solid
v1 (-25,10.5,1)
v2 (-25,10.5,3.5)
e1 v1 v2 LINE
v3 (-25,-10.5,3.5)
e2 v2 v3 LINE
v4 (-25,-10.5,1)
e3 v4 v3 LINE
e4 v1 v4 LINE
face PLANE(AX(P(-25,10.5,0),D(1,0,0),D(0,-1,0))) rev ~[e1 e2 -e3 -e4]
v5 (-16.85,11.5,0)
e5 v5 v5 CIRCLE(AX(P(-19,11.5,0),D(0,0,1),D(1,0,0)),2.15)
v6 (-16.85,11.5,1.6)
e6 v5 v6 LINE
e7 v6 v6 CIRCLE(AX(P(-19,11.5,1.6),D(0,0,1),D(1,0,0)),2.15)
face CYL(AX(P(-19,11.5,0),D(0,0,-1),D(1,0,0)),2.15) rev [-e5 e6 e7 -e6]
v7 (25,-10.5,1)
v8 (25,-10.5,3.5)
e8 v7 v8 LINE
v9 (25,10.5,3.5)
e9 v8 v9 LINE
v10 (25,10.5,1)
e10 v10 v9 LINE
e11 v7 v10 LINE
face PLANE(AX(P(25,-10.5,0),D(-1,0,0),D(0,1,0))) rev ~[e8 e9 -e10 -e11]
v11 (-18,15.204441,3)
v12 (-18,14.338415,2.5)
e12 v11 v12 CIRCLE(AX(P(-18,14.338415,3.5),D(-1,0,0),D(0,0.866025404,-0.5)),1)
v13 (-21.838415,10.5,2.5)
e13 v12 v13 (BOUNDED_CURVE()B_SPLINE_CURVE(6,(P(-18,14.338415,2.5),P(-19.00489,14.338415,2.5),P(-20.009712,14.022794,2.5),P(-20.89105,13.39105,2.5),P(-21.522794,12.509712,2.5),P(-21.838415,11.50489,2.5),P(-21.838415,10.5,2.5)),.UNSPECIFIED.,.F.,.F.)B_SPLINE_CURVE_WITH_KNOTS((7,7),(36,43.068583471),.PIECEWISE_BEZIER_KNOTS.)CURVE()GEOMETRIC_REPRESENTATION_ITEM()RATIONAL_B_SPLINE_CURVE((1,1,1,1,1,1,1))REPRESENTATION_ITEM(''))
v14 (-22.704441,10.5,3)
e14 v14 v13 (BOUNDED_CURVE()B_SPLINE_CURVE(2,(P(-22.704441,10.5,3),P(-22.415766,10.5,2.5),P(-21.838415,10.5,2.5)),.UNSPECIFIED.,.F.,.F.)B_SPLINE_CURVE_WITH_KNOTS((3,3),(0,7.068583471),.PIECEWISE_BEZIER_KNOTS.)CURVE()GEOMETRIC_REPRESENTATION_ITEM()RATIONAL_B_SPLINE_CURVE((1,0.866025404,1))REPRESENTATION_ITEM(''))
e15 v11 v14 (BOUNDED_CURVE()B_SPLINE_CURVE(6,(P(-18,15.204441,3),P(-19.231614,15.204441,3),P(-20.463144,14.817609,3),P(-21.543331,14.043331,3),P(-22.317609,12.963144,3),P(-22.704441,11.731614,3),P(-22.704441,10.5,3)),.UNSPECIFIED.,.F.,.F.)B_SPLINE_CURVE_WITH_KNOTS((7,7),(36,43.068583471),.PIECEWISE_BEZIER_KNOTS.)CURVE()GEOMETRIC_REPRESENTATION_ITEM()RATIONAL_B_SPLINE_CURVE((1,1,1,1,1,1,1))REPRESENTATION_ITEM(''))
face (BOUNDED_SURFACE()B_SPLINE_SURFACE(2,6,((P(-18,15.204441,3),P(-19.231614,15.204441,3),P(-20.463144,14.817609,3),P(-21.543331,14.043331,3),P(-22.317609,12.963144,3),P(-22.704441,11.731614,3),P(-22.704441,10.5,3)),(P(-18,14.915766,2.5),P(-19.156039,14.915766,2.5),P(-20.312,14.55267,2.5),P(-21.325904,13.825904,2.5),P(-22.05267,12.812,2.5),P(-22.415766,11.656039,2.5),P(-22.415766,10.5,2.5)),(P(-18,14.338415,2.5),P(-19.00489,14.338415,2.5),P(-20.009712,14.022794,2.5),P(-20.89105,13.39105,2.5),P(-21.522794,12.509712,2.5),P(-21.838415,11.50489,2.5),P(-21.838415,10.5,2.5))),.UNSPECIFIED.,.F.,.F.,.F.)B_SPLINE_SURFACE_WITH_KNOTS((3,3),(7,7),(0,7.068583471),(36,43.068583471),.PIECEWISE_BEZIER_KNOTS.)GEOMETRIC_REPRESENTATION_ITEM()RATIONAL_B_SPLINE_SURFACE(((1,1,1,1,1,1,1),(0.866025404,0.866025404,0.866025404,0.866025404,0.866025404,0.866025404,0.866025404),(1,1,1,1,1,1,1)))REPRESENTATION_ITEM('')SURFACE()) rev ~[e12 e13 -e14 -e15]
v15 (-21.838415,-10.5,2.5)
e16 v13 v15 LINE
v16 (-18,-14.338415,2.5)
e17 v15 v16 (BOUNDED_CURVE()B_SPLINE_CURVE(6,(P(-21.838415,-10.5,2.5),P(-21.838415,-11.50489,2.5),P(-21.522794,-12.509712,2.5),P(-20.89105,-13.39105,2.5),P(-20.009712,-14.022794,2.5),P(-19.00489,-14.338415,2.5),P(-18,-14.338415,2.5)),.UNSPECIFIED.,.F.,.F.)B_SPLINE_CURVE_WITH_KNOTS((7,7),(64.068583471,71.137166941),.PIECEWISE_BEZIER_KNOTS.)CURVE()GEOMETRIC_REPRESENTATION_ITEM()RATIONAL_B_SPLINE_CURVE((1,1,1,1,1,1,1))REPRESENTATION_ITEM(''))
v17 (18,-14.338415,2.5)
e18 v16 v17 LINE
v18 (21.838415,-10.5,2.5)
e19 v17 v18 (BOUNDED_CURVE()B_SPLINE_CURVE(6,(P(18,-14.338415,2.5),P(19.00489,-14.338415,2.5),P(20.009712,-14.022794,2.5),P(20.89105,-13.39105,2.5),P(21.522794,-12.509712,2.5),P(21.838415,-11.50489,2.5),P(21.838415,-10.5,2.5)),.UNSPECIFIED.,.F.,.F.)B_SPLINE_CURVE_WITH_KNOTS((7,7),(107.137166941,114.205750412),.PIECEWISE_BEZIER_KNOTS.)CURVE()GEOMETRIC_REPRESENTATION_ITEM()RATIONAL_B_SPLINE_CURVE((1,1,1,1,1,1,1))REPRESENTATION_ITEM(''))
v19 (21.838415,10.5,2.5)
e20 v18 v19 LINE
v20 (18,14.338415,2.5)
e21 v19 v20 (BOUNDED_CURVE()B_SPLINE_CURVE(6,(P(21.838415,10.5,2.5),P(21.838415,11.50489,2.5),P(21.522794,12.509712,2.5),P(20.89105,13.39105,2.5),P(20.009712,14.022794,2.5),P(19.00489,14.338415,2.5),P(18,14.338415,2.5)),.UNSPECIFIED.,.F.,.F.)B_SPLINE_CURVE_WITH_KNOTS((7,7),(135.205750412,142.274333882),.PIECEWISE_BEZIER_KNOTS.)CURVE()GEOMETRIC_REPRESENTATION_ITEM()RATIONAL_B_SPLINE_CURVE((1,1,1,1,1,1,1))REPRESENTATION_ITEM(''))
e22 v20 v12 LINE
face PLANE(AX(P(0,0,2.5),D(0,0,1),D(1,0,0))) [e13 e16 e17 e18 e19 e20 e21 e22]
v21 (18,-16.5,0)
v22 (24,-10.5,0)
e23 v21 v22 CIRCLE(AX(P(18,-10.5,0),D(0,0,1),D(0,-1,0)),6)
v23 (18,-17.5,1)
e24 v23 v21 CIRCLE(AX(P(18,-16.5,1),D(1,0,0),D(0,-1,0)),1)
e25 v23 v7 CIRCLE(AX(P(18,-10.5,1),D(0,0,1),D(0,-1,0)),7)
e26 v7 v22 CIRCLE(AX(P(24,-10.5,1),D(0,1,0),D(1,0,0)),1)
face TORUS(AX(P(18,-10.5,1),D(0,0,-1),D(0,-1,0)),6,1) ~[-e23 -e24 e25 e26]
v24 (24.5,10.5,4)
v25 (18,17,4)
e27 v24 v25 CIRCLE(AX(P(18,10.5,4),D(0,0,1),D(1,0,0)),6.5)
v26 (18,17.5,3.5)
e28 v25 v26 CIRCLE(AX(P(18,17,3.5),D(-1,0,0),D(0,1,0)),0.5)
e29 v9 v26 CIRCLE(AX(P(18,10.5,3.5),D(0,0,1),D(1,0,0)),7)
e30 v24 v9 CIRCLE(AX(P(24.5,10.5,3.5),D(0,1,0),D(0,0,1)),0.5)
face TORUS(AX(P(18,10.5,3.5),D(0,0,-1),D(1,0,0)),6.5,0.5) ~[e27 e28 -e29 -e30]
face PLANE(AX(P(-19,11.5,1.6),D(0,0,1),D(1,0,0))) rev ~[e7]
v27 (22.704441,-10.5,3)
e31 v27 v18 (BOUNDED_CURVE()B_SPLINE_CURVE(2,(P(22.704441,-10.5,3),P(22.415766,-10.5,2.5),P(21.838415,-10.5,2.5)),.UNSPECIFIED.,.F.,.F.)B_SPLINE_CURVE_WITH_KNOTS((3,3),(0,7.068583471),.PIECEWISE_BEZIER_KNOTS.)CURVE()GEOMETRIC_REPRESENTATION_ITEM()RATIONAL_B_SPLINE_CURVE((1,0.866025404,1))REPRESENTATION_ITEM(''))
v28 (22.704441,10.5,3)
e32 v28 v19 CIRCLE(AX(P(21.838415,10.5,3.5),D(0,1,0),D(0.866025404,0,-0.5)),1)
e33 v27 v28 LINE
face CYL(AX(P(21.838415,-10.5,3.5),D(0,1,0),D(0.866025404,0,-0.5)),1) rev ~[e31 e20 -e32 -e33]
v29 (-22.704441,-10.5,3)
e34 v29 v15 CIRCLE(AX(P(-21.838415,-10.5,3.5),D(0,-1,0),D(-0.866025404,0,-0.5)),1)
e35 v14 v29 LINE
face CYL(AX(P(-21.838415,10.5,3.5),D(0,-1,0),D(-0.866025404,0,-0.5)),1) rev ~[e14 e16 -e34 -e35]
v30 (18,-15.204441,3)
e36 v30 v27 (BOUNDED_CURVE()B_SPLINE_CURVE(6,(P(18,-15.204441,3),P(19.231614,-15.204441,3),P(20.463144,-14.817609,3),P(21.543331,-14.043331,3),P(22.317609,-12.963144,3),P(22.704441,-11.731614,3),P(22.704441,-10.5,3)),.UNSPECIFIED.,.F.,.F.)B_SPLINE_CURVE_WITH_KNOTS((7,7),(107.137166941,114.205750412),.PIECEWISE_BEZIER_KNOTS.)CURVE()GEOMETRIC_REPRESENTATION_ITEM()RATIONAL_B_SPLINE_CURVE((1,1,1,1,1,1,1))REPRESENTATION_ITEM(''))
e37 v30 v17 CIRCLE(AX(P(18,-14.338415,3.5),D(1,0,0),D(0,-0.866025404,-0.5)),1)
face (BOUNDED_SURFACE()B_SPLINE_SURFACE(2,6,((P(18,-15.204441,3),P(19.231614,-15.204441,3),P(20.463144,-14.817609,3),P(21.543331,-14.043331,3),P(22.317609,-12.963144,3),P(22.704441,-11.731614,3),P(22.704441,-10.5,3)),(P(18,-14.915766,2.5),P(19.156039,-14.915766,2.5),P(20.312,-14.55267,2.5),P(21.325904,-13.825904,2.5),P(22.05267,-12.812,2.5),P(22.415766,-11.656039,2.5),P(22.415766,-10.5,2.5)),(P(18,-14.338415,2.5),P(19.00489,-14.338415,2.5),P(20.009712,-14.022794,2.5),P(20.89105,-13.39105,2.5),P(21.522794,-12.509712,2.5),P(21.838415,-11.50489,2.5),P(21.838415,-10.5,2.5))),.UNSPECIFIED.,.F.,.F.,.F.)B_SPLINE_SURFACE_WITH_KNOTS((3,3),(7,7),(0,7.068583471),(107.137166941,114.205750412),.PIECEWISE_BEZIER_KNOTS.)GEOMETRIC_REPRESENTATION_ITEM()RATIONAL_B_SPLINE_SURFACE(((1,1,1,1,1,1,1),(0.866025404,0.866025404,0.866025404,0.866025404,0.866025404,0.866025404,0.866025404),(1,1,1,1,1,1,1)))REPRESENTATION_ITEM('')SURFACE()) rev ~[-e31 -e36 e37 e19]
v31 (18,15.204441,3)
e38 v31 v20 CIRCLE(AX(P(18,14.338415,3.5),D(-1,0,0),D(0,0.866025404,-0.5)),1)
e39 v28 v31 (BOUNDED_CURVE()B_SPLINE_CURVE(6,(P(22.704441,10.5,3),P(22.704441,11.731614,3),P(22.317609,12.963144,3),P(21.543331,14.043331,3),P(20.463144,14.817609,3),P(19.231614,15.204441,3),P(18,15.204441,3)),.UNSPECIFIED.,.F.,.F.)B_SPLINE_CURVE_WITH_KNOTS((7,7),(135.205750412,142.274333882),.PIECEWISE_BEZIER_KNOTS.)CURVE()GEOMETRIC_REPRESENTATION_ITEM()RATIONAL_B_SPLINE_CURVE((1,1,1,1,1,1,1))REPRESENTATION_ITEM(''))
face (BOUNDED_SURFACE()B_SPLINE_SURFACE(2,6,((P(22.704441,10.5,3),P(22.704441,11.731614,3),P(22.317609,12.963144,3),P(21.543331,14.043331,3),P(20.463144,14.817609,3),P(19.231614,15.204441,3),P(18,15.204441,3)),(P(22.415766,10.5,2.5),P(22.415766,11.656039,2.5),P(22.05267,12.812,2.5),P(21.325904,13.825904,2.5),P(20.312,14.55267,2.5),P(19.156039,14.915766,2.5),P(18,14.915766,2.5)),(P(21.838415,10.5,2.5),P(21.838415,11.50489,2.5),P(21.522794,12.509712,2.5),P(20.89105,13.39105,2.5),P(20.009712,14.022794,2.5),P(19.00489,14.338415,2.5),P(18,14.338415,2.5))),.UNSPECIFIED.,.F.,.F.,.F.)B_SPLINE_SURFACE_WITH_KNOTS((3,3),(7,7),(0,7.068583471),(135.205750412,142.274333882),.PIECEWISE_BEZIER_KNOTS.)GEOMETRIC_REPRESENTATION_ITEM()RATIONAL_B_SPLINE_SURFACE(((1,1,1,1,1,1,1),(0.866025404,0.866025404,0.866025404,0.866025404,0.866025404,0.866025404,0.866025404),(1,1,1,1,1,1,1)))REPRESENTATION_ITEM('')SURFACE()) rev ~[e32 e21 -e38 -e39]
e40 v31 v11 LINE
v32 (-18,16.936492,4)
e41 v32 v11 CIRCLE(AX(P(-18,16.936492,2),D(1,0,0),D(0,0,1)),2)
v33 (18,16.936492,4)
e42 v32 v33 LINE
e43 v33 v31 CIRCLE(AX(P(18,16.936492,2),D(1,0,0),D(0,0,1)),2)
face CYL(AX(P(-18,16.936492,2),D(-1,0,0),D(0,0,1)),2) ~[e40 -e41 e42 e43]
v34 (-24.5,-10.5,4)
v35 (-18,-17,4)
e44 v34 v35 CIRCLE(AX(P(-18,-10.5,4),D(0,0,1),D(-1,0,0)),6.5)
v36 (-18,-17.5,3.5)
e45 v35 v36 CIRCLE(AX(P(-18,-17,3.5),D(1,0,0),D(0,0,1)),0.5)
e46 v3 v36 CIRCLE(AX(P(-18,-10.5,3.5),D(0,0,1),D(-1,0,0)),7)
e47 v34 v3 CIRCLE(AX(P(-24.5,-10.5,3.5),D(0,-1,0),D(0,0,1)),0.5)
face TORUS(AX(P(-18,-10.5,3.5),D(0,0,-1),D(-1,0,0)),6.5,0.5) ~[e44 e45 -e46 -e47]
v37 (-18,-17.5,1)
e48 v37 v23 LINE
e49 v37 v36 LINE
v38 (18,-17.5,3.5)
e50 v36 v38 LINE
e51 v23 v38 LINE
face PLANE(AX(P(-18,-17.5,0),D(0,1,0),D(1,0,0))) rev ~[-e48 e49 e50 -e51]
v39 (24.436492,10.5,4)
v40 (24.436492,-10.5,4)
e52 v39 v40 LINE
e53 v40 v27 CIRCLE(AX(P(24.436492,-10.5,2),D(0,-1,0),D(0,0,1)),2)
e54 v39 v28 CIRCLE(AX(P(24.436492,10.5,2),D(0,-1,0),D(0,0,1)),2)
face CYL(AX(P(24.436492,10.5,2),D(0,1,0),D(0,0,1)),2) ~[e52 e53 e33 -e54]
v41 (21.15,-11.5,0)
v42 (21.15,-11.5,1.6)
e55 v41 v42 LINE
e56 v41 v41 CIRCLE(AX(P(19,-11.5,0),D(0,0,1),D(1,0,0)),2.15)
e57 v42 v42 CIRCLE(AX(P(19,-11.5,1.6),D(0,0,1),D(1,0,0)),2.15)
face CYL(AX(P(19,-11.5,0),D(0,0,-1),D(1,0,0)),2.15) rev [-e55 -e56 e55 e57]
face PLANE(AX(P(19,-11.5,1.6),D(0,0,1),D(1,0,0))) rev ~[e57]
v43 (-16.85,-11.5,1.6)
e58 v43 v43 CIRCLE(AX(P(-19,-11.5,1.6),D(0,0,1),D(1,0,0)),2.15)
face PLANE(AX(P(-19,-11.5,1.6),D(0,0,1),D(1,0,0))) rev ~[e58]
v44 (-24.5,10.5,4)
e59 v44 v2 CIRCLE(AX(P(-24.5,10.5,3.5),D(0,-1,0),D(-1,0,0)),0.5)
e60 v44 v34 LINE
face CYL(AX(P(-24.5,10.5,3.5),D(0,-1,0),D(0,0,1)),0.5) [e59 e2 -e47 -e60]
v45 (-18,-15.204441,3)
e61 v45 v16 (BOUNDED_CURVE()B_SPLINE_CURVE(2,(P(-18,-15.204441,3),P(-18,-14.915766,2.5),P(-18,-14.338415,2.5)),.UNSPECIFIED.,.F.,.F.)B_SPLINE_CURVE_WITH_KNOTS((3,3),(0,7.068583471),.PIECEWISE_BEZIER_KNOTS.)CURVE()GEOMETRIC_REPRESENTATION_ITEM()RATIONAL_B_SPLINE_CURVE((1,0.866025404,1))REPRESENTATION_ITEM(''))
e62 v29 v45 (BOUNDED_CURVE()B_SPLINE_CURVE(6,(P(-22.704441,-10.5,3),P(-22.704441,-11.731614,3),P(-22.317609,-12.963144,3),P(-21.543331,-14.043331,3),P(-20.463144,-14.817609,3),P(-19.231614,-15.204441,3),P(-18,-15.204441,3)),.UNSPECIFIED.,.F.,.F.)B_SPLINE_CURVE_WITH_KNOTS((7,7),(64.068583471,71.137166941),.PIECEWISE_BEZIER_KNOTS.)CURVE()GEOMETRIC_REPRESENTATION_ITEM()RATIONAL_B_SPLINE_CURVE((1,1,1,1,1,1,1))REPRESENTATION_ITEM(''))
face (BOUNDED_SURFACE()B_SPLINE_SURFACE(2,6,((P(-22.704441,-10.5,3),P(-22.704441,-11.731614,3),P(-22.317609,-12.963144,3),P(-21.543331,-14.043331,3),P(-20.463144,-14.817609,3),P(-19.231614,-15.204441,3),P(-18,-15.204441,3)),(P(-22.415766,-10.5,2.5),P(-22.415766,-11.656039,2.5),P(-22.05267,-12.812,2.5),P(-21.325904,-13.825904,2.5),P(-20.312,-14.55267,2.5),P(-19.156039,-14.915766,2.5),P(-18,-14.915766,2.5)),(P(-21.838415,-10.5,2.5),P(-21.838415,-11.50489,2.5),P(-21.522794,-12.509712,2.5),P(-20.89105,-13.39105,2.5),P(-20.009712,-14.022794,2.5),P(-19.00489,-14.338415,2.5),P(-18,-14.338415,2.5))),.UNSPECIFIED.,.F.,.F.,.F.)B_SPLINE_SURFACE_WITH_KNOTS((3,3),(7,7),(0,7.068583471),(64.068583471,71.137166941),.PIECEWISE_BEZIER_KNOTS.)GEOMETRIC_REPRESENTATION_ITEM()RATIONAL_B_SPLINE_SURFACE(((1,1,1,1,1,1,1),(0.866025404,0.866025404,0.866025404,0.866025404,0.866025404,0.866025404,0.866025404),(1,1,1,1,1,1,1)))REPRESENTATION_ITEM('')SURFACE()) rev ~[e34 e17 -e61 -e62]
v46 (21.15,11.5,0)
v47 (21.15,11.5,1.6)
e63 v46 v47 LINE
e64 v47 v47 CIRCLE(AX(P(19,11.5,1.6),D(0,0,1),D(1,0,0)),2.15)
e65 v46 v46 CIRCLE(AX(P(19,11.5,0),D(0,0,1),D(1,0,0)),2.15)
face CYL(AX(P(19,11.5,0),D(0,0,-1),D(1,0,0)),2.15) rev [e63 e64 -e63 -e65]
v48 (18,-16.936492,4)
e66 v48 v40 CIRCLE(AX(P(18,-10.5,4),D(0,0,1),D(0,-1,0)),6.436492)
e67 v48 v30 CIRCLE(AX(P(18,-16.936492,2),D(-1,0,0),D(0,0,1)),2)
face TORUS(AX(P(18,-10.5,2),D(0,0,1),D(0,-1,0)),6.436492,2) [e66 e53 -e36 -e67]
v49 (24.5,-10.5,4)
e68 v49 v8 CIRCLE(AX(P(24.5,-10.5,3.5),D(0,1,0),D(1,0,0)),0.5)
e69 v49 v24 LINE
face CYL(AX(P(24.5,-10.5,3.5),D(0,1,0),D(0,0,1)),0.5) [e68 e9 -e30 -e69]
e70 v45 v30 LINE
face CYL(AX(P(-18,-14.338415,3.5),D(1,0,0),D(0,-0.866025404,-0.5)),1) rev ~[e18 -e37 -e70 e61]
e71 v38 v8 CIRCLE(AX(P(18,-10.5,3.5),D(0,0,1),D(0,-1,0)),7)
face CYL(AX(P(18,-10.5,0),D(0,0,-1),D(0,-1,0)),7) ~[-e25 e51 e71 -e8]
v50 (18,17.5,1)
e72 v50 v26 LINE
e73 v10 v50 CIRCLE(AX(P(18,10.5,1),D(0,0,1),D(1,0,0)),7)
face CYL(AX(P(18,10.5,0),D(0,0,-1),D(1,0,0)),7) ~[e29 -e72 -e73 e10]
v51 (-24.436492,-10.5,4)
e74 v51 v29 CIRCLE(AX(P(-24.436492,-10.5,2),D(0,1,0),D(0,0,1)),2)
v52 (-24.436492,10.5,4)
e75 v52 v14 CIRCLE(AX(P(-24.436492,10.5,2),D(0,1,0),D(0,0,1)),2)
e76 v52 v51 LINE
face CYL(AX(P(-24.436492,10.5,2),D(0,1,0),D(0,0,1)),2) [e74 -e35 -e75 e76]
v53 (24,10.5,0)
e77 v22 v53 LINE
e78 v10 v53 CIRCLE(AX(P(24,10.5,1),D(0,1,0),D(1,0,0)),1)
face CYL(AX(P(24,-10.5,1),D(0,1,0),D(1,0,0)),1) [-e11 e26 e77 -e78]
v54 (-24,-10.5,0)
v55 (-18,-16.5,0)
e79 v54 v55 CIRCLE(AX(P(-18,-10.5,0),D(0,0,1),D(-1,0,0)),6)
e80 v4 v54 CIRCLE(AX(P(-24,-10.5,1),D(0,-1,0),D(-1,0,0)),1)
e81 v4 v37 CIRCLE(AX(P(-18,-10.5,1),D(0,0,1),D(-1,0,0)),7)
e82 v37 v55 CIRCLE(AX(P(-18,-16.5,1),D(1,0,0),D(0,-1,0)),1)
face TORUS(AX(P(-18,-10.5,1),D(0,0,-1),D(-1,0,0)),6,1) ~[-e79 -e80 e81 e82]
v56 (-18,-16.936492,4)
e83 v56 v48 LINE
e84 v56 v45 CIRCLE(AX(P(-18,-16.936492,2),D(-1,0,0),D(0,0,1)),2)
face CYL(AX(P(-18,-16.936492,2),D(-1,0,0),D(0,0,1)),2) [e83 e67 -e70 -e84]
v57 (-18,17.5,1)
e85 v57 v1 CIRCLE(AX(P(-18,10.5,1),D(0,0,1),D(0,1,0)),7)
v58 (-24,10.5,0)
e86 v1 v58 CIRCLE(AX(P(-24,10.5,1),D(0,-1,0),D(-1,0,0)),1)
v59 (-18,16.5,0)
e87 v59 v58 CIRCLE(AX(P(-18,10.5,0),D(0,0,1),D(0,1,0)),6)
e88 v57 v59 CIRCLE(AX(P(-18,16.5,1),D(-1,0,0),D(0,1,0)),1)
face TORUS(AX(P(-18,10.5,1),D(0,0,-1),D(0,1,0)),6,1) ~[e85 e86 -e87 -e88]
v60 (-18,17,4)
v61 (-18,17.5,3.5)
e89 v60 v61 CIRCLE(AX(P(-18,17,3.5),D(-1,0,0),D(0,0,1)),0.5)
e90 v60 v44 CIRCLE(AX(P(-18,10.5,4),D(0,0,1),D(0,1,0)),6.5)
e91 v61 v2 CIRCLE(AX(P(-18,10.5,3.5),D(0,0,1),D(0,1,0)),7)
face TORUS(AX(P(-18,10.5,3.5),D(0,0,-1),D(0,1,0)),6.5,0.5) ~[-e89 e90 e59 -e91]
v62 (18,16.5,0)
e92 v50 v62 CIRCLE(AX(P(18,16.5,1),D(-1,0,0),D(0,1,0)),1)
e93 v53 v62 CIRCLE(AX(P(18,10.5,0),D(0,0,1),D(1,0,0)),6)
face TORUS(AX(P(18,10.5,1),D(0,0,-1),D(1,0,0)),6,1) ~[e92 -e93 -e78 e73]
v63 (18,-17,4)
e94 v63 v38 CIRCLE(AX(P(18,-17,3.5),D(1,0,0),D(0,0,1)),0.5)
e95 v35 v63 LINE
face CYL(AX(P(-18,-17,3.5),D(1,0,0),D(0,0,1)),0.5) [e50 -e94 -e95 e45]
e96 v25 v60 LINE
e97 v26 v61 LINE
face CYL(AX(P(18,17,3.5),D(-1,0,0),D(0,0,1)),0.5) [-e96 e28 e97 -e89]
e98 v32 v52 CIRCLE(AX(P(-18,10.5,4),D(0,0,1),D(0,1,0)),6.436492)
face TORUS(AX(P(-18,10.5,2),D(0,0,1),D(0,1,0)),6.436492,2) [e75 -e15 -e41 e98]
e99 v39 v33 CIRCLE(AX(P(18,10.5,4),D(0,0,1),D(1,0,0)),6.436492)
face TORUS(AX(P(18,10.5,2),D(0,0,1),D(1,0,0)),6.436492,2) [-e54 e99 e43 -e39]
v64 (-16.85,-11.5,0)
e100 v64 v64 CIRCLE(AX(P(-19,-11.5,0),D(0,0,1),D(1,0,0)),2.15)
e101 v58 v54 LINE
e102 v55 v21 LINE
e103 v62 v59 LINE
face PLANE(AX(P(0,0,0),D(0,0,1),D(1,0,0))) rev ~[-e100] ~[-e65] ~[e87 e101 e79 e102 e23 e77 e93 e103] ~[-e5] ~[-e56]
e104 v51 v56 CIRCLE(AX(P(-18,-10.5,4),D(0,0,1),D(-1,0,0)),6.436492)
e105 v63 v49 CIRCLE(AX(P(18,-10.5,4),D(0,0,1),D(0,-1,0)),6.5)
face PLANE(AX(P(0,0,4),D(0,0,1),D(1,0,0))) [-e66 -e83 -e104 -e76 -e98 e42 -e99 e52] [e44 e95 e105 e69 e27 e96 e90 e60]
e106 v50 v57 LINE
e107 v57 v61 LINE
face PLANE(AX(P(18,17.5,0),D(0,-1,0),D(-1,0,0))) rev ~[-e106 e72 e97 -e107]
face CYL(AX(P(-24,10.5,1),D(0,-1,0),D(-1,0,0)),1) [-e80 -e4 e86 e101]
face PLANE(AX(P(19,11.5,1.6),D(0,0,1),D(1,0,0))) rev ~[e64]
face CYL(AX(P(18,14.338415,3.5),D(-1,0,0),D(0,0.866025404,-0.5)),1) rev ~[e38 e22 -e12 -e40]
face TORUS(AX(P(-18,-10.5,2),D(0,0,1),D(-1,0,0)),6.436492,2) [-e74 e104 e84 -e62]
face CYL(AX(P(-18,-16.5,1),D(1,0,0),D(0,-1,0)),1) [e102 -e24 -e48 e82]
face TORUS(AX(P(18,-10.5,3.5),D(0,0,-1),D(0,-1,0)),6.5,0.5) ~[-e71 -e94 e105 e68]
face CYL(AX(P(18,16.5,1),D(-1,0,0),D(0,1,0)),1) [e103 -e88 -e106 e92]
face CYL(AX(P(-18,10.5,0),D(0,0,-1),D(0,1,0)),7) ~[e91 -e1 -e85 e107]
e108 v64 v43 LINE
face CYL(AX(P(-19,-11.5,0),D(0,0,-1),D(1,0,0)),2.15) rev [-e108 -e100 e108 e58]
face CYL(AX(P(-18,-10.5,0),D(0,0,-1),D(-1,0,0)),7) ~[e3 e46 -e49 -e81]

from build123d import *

# Parameters (mm, degrees)
F1_DEPTH     = 4
F2_R         = 1
F3_T         = -2.5
F4_T1_DEPTH  = 36
F4_T3_DEPTH  = 21
F4_T6_ANGLE  = 90
F4_T8_ANGLE  = 90
F4_T10_ANGLE = 90
F4_T12_ANGLE = 90
F5_R         = 1
F6_R         = 0.5
F7_R         = 2.15
F8_DEPTH     = 1.6


# Not quite as in the source:
# - a fillet or chamfer that OpenCascade refuses, or shapes differently, is made with other operations: its cross-section is extruded or revolved along the edge and cut away or added


with BuildPart() as f1:
    # F0 (on Top) → F1 (new body)
    with BuildSketch(Plane.XY):
        with BuildLine():
            Line((-18, -17.5), (18, -17.5))
            ThreePointArc((18, -17.5), (22.9497474683, -15.4497474683), (25, -10.5))
            Line((25, -10.5), (25, 10.5))
            ThreePointArc((25, 10.5), (22.9497474683, 15.4497474683), (18, 17.5))
            Line((18, 17.5), (-18, 17.5))
            ThreePointArc((-18, 17.5), (-22.9497474683, 15.4497474683), (-25, 10.5))
            Line((-25, 10.5), (-25, -10.5))
            ThreePointArc((-25, -10.5), (-22.9497474683, -15.4497474683), (-18, -17.5))
        make_face()
    extrude(amount=F1_DEPTH)

    # F2
    f2_edges = [f1.edges().sort_by_distance(p)[0] for p in [
        (0, -17.5, 0),
    ]]
    fillet(f2_edges, radius=F2_R)

    # F3
    f3_openings = [f1.faces().sort_by_distance(p)[0] for p in [
        (0, 0, 4),
    ]]
    offset(amount=F3_T, openings=f3_openings)

    # F4: fillet of radius 2 on 1 edges, made by hand

    # F4_s2 → F4_t1 (cut)
    with BuildSketch(Plane.YZ.offset(-18)):
        with BuildLine():
            ThreePointArc((16.9364916731, 4), (15.7117468017, 3.5811388301), (15, 2.5))
            Line((15, 2.5), (15, 4))
            Line((15, 4), (16.9364916731, 4))
        make_face()
        with BuildLine():
            ThreePointArc((-16.9364916731, 4), (-15.7117468017, 3.5811388301), (-15, 2.5))
            Line((-15, 2.5), (-15, 4))
            Line((-15, 4), (-16.9364916731, 4))
        make_face()
    extrude(amount=F4_T1_DEPTH, mode=Mode.SUBTRACT)

    # F4_s4 → F4_t3 (cut)
    with BuildSketch(Plane.XZ.offset(-10.5)):
        with BuildLine():
            ThreePointArc((-24.4364916731, 4), (-23.2117468017, 3.5811388301), (-22.5, 2.5))
            Line((-22.5, 2.5), (-22.5, 4))
            Line((-22.5, 4), (-24.4364916731, 4))
        make_face()
        with BuildLine():
            ThreePointArc((24.4364916731, 4), (23.2117468017, 3.5811388301), (22.5, 2.5))
            Line((22.5, 2.5), (22.5, 4))
            Line((22.5, 4), (24.4364916731, 4))
        make_face()
    extrude(amount=F4_T3_DEPTH, mode=Mode.SUBTRACT)

    # F4_s5 → F4_t6 (revolve, cut)
    with BuildSketch(Plane.XZ.offset(-10.5)):
        with BuildLine():
            ThreePointArc((24.4364916731, 4), (23.2117468017, 3.5811388301), (22.5, 2.5))
            Line((22.5, 2.5), (22.5, 4))
            Line((22.5, 4), (24.4364916731, 4))
        make_face()
    revolve(axis=Axis((18, 10.5, 4), (0, 0, 1)), revolution_arc=F4_T6_ANGLE, mode=Mode.SUBTRACT)

    # F4_s7 → F4_t8 (revolve, cut)
    with BuildSketch(Plane.YZ.offset(-18)):
        with BuildLine():
            ThreePointArc((16.9364916731, 4), (15.7117468017, 3.5811388301), (15, 2.5))
            Line((15, 2.5), (15, 4))
            Line((15, 4), (16.9364916731, 4))
        make_face()
    revolve(axis=Axis((-18, 10.5, 4), (0, 0, 1)), revolution_arc=F4_T8_ANGLE, mode=Mode.SUBTRACT)

    # F4_s9 → F4_t10 (revolve, cut)
    with BuildSketch(Plane.XZ.offset(10.5)):
        with BuildLine():
            ThreePointArc((-24.4364916731, 4), (-23.2117468017, 3.5811388301), (-22.5, 2.5))
            Line((-22.5, 2.5), (-22.5, 4))
            Line((-22.5, 4), (-24.4364916731, 4))
        make_face()
    revolve(axis=Axis((-18, -10.5, 4), (0, 0, 1)), revolution_arc=F4_T10_ANGLE, mode=Mode.SUBTRACT)

    # F4_s11 → F4_t12 (revolve, cut)
    with BuildSketch(Plane.YZ.offset(18)):
        with BuildLine():
            ThreePointArc((-16.9364916731, 4), (-15.7117468017, 3.5811388301), (-15, 2.5))
            Line((-15, 2.5), (-15, 4))
            Line((-15, 4), (-16.9364916731, 4))
        make_face()
    revolve(axis=Axis((18, -10.5, 4), (0, 0, 1)), revolution_arc=F4_T12_ANGLE, mode=Mode.SUBTRACT)

    # F5
    f5_edges = [f1.edges().sort_by_distance(p)[0] for p in [
        (0, 15, 2.5),
        (0, -15, 2.5),
        (21.181981, -13.681981, 2.5),
        (22.5, 0, 2.5),
        (21.181981, 13.681981, 2.5),
        (-21.181981, 13.681981, 2.5),
        (-22.5, 0, 2.5),
        (-21.181981, -13.681981, 2.5),
    ]]
    fillet(f5_edges, radius=F5_R)

    # F6
    f6_edges = [f1.edges().sort_by_distance(p)[0] for p in [
        (0, -17.5, 4),
        (-22.949747, -15.449747, 4),
        (22.949747, -15.449747, 4),
        (-25, 0, 4),
        (25, 0, 4),
        (-22.949747, 15.449747, 4),
        (22.949747, 15.449747, 4),
        (0, 17.5, 4),
    ]]
    fillet(f6_edges, radius=F6_R)

    # F7 (on face) → F8 (cut)
    with BuildSketch(Plane.XY):
        with Locations((-19, -11.5)):
            Circle(F7_R)
        with Locations((19, -11.5)):
            Circle(F7_R)
        with Locations((-19, 11.5)):
            Circle(F7_R)
        with Locations((19, 11.5)):
            Circle(F7_R)
    extrude(amount=F8_DEPTH, mode=Mode.SUBTRACT)


solid = f1.part
